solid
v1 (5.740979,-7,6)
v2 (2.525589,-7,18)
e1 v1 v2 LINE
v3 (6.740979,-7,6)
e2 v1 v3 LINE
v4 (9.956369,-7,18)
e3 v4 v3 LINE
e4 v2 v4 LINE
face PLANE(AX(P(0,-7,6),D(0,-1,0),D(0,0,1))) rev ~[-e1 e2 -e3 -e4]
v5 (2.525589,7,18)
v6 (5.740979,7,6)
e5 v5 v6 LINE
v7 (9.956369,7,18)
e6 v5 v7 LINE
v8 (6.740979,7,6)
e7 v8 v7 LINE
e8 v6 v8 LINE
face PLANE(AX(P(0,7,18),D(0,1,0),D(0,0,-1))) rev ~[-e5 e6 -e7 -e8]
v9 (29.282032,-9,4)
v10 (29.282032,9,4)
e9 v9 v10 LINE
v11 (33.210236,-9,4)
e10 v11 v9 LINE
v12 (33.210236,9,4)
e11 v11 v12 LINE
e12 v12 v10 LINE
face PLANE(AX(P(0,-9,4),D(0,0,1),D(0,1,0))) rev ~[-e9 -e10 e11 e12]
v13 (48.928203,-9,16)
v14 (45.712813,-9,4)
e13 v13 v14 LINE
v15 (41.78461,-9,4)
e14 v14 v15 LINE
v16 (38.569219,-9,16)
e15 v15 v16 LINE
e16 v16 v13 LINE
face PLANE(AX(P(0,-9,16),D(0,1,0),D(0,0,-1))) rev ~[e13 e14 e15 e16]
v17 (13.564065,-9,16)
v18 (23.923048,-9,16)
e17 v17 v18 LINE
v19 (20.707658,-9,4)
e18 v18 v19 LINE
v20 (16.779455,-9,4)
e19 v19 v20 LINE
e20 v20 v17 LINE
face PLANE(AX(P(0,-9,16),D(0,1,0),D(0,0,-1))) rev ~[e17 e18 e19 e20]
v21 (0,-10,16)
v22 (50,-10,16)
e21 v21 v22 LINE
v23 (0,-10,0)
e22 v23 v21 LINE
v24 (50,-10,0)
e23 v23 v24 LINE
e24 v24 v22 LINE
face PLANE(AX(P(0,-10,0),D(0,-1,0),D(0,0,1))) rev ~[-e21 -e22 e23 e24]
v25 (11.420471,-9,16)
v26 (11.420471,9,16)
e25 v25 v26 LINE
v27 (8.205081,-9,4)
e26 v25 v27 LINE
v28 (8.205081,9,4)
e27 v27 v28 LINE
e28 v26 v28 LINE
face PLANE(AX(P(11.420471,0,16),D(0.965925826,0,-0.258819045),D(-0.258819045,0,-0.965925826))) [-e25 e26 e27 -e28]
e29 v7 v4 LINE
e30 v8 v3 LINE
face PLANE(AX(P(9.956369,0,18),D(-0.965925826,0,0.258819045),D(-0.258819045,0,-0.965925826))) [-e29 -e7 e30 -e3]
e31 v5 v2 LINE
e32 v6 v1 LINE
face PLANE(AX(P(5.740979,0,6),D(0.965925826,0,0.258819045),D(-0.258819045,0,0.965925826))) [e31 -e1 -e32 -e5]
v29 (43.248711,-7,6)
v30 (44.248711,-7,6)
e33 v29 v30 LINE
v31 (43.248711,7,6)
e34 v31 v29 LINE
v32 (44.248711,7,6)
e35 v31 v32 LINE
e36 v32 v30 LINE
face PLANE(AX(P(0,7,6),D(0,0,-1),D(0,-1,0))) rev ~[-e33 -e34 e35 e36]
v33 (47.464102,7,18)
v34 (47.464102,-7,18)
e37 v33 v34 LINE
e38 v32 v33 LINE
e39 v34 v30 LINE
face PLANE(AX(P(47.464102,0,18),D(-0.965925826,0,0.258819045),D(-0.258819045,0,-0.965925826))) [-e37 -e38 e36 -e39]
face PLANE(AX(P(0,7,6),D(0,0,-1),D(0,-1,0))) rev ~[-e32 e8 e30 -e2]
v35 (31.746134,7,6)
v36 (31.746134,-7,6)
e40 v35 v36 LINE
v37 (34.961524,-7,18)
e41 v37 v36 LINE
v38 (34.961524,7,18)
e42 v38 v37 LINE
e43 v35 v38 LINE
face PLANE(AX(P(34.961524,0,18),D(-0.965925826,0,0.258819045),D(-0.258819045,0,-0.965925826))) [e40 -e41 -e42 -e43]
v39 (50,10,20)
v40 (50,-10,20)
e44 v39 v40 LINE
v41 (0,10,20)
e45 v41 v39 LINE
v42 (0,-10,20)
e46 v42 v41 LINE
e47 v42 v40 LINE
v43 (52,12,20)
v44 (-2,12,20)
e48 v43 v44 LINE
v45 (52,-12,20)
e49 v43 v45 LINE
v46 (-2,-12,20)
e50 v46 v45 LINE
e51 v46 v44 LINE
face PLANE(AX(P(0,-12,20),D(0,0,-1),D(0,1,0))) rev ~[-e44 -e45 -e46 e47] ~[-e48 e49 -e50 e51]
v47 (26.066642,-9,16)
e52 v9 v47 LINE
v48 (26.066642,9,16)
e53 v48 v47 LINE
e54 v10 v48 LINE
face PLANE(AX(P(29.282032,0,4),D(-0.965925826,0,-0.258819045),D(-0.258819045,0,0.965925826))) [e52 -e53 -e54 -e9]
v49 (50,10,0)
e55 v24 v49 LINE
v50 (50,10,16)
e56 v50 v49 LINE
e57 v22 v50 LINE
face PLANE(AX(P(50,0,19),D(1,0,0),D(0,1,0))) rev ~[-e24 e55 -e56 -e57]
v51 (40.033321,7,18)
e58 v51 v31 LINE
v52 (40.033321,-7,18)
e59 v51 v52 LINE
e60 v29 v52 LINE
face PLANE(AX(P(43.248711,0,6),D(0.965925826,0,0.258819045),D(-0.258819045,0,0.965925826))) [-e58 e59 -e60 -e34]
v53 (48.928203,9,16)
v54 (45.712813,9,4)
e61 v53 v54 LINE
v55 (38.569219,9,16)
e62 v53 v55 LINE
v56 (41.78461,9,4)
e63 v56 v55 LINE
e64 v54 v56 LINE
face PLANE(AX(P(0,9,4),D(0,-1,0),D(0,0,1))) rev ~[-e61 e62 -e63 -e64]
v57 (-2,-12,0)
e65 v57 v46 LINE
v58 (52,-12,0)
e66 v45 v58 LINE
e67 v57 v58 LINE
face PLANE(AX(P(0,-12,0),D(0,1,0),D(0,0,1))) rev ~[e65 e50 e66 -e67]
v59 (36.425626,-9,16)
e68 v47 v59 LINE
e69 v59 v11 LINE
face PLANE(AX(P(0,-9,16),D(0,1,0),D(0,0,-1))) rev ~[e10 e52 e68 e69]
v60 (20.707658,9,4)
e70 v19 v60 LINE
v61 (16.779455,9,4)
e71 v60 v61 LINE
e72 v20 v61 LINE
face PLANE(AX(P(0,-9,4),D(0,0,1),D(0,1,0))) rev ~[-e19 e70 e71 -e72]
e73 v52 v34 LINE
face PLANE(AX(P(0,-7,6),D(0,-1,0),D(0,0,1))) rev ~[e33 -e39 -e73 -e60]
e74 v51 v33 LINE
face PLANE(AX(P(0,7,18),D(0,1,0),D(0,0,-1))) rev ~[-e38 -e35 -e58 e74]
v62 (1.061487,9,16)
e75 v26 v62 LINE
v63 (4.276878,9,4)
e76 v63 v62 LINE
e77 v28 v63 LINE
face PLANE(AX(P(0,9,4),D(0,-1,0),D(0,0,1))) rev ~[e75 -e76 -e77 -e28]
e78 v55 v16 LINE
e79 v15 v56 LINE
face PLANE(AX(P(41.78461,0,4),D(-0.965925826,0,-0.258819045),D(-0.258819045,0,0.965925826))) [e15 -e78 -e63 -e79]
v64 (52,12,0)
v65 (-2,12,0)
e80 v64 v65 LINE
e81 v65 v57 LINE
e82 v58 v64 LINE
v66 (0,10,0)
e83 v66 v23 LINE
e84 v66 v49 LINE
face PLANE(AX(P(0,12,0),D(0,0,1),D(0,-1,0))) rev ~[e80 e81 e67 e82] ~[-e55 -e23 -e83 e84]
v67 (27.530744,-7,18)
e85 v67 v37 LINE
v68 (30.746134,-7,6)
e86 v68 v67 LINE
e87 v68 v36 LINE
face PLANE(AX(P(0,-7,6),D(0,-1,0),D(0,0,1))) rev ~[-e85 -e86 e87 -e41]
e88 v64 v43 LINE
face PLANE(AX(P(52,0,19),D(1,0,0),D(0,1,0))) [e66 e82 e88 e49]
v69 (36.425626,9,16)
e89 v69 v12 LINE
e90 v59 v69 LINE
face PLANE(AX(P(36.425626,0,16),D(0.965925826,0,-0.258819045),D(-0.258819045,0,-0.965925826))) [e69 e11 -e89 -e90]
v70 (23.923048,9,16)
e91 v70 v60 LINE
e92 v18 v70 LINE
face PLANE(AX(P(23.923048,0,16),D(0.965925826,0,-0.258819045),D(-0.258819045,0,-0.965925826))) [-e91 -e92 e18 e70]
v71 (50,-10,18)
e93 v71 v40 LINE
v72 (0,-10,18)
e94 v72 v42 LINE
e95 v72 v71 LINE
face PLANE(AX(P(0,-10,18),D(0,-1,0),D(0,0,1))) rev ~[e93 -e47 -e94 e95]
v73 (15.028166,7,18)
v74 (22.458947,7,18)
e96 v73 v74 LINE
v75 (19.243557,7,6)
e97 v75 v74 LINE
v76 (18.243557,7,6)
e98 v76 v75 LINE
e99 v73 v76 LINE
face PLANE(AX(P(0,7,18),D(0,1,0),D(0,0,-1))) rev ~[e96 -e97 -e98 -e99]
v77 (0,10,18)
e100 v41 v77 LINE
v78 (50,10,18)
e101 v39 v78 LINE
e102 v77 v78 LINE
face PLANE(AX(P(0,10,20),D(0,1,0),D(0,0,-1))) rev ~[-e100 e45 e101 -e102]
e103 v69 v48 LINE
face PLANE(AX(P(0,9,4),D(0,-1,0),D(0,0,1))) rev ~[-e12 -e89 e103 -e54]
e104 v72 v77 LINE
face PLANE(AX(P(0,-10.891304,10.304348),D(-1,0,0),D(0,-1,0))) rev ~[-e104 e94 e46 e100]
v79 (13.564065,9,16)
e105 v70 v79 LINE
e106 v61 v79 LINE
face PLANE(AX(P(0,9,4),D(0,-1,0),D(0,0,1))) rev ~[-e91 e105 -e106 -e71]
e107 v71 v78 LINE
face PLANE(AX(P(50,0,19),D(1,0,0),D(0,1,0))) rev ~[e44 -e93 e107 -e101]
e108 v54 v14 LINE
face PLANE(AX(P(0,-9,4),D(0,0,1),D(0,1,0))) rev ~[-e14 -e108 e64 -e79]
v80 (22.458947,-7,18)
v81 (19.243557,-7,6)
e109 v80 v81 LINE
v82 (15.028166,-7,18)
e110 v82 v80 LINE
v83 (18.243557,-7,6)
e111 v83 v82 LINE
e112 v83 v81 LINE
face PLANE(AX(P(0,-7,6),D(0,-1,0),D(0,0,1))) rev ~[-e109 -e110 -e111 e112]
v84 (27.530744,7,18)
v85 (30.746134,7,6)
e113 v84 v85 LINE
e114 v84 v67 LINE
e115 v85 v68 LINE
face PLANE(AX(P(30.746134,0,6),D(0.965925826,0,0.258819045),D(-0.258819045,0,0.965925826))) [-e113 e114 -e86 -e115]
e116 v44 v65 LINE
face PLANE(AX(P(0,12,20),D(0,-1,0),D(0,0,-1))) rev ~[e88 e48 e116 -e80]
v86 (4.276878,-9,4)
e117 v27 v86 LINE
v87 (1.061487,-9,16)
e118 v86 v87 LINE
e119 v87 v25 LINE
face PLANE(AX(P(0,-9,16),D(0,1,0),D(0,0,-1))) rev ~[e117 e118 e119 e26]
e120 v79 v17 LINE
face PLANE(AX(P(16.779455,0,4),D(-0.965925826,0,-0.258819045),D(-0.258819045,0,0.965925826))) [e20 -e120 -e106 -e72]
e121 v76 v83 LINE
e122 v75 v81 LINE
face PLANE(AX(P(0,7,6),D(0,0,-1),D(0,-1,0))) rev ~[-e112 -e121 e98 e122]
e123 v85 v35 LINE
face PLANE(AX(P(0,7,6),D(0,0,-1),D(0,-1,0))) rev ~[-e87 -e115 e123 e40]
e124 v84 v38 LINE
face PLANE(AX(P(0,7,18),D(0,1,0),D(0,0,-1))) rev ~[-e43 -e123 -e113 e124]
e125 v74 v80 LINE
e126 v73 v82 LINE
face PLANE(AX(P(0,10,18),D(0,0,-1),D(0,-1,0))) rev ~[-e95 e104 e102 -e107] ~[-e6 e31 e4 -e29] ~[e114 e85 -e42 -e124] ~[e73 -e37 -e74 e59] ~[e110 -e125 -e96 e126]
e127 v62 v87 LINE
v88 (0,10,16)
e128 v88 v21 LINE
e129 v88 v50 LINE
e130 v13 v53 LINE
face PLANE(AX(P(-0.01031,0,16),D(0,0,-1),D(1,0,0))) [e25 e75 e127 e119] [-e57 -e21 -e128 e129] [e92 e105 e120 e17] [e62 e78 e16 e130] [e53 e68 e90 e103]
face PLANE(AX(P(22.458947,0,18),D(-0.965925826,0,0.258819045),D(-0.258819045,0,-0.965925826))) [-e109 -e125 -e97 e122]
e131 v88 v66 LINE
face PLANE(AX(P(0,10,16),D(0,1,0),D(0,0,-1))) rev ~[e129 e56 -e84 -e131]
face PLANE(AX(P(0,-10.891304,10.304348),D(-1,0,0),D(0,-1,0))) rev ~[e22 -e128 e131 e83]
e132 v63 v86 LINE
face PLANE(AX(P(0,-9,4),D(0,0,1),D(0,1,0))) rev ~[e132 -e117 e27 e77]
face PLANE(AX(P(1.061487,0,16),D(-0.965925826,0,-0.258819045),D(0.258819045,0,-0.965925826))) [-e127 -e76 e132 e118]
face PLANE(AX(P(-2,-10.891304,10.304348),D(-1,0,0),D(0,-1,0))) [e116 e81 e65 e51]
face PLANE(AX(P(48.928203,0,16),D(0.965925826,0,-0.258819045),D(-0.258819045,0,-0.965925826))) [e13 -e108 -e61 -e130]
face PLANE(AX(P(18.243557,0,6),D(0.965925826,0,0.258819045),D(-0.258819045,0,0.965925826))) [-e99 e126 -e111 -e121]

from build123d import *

# Parameters (mm, degrees)
F1_DEPTH = 50
F3_DEPTH = 9
F4_DEPTH = 9
F5_W     = 20
F5_H     = 2
F5_H_2   = 16
F6_DEPTH = 2
F8_DEPTH = 2


# Not quite as in the source:
# - a feature names something its author has since deleted; it is built from what else it names


with BuildPart() as f1:
    # F0 (on Right) → F1 (new body)
    with BuildSketch(Plane.YZ):
        Polygon((10, 18), (7, 18), (7, 6), (0, 6), (-7, 6), (-7, 18), (-10, 18), (-10, 20), (-12, 20), (-12, 0), (-10, 0), (-10, 16), (-9, 16), (-9, 4), (0, 4), (9, 4), (9, 16), (10, 16), (10, 0), (12, 0), (12, 20), (10, 20), align=None)
    extrude(amount=F1_DEPTH)

    # F2 (on Front) → F3 (join, symmetric)
    with BuildSketch(Plane.XZ):
        Polygon((37.4974226119, 16), (38.5692193817, 16), (41.7846096908, 4), (45.7128129211, 4), (48.9282032303, 16), (50, 16), (50, 18), (49.4641016151, 18), (47.4641016151, 18), (44.248711306, 6), (43.248711306, 6), (40.0333209968, 18), (38.0333209968, 18), (37.4974226119, 18), (36.9615242271, 18), (34.9615242271, 18), (31.7461339179, 6), (30.7461339179, 6), (27.5307436087, 18), (25.5307436087, 18), (24.9948452239, 18), (24.458946839, 18), (22.458946839, 18), (19.2435565298, 6), (18.2435565298, 6), (15.0281662206, 18), (13.0281662206, 18), (12.4922678358, 18), (11.9563694509, 18), (9.9563694509, 18), (6.7409791417, 6), (5.7409791417, 6), (2.5255888326, 18), (0.5255888326, 18), (-0.0103095523, 18), (-0.0103095523, 16), (1.0614872174, 16), (4.2768775266, 4), (8.2050807569, 4), (11.4204710661, 16), (12.4922678358, 16), (13.5640646055, 16), (16.7794549147, 4), (20.707658145, 4), (23.9230484541, 16), (24.9948452239, 16), (26.0666419936, 16), (29.2820323028, 4), (33.210235533, 4), (36.4256258422, 16), align=None)
    extrude(amount=F3_DEPTH, both=True)

    # F2 (on Front) → F4 (cut, symmetric)
    with BuildSketch(Plane.XZ):
        Polygon((48.9282032303, 16), (45.7128129211, 4), (50, 4), (50, 16), align=None)
        Polygon((41.7846096908, 4), (38.5692193817, 16), (37.4974226119, 16), (36.4256258422, 16), (33.210235533, 4), (37.4974226119, 4), align=None)
        Polygon((24.9948452239, 4), (29.2820323028, 4), (26.0666419936, 16), (24.9948452239, 16), (23.9230484541, 16), (20.707658145, 4), align=None)
        Polygon((12.4922678358, 4), (16.7794549147, 4), (13.5640646055, 16), (12.4922678358, 16), (11.4204710661, 16), (8.2050807569, 4), align=None)
        Polygon((-0.0103095523, 4), (4.2768775266, 4), (1.0614872174, 16), (-0.0103095523, 16), align=None)
    extrude(amount=F4_DEPTH, both=True, mode=Mode.SUBTRACT)

    # F5 (on face) → F6 (join)
    with BuildSketch(Plane.YZ.offset(50)):
        with Locations((0, 19)):
            Rectangle(F5_W, F5_H)
        Polygon((-10, 20), (-12, 20), (-12, 0), (-10, 0), (-10, 16), (10, 16), (10, 0), (12, 0), (12, 20), (10, 20), (10, 18), (-10, 18), align=None)
        with Locations((0, 8)):
            Rectangle(F5_W, F5_H_2)
    extrude(amount=F6_DEPTH)

    # F7 (on face) → F8 (join)
    with BuildSketch(Plane(origin=(0, 0, 0), x_dir=(0, -1, 0), z_dir=(-1, 0, 0))):
        Polygon((12, 20), (10, 20), (10, 18), (9, 18), (9, 16), (10, 16), (10, 0), (12, 0), align=None)
        Polygon((10, 20), (-12, 20), (-12, 0), (10, 0), (10, 16), (9, 16), (9, 18), (10, 18), align=None)
    extrude(amount=F8_DEPTH)


solid = f1.part
